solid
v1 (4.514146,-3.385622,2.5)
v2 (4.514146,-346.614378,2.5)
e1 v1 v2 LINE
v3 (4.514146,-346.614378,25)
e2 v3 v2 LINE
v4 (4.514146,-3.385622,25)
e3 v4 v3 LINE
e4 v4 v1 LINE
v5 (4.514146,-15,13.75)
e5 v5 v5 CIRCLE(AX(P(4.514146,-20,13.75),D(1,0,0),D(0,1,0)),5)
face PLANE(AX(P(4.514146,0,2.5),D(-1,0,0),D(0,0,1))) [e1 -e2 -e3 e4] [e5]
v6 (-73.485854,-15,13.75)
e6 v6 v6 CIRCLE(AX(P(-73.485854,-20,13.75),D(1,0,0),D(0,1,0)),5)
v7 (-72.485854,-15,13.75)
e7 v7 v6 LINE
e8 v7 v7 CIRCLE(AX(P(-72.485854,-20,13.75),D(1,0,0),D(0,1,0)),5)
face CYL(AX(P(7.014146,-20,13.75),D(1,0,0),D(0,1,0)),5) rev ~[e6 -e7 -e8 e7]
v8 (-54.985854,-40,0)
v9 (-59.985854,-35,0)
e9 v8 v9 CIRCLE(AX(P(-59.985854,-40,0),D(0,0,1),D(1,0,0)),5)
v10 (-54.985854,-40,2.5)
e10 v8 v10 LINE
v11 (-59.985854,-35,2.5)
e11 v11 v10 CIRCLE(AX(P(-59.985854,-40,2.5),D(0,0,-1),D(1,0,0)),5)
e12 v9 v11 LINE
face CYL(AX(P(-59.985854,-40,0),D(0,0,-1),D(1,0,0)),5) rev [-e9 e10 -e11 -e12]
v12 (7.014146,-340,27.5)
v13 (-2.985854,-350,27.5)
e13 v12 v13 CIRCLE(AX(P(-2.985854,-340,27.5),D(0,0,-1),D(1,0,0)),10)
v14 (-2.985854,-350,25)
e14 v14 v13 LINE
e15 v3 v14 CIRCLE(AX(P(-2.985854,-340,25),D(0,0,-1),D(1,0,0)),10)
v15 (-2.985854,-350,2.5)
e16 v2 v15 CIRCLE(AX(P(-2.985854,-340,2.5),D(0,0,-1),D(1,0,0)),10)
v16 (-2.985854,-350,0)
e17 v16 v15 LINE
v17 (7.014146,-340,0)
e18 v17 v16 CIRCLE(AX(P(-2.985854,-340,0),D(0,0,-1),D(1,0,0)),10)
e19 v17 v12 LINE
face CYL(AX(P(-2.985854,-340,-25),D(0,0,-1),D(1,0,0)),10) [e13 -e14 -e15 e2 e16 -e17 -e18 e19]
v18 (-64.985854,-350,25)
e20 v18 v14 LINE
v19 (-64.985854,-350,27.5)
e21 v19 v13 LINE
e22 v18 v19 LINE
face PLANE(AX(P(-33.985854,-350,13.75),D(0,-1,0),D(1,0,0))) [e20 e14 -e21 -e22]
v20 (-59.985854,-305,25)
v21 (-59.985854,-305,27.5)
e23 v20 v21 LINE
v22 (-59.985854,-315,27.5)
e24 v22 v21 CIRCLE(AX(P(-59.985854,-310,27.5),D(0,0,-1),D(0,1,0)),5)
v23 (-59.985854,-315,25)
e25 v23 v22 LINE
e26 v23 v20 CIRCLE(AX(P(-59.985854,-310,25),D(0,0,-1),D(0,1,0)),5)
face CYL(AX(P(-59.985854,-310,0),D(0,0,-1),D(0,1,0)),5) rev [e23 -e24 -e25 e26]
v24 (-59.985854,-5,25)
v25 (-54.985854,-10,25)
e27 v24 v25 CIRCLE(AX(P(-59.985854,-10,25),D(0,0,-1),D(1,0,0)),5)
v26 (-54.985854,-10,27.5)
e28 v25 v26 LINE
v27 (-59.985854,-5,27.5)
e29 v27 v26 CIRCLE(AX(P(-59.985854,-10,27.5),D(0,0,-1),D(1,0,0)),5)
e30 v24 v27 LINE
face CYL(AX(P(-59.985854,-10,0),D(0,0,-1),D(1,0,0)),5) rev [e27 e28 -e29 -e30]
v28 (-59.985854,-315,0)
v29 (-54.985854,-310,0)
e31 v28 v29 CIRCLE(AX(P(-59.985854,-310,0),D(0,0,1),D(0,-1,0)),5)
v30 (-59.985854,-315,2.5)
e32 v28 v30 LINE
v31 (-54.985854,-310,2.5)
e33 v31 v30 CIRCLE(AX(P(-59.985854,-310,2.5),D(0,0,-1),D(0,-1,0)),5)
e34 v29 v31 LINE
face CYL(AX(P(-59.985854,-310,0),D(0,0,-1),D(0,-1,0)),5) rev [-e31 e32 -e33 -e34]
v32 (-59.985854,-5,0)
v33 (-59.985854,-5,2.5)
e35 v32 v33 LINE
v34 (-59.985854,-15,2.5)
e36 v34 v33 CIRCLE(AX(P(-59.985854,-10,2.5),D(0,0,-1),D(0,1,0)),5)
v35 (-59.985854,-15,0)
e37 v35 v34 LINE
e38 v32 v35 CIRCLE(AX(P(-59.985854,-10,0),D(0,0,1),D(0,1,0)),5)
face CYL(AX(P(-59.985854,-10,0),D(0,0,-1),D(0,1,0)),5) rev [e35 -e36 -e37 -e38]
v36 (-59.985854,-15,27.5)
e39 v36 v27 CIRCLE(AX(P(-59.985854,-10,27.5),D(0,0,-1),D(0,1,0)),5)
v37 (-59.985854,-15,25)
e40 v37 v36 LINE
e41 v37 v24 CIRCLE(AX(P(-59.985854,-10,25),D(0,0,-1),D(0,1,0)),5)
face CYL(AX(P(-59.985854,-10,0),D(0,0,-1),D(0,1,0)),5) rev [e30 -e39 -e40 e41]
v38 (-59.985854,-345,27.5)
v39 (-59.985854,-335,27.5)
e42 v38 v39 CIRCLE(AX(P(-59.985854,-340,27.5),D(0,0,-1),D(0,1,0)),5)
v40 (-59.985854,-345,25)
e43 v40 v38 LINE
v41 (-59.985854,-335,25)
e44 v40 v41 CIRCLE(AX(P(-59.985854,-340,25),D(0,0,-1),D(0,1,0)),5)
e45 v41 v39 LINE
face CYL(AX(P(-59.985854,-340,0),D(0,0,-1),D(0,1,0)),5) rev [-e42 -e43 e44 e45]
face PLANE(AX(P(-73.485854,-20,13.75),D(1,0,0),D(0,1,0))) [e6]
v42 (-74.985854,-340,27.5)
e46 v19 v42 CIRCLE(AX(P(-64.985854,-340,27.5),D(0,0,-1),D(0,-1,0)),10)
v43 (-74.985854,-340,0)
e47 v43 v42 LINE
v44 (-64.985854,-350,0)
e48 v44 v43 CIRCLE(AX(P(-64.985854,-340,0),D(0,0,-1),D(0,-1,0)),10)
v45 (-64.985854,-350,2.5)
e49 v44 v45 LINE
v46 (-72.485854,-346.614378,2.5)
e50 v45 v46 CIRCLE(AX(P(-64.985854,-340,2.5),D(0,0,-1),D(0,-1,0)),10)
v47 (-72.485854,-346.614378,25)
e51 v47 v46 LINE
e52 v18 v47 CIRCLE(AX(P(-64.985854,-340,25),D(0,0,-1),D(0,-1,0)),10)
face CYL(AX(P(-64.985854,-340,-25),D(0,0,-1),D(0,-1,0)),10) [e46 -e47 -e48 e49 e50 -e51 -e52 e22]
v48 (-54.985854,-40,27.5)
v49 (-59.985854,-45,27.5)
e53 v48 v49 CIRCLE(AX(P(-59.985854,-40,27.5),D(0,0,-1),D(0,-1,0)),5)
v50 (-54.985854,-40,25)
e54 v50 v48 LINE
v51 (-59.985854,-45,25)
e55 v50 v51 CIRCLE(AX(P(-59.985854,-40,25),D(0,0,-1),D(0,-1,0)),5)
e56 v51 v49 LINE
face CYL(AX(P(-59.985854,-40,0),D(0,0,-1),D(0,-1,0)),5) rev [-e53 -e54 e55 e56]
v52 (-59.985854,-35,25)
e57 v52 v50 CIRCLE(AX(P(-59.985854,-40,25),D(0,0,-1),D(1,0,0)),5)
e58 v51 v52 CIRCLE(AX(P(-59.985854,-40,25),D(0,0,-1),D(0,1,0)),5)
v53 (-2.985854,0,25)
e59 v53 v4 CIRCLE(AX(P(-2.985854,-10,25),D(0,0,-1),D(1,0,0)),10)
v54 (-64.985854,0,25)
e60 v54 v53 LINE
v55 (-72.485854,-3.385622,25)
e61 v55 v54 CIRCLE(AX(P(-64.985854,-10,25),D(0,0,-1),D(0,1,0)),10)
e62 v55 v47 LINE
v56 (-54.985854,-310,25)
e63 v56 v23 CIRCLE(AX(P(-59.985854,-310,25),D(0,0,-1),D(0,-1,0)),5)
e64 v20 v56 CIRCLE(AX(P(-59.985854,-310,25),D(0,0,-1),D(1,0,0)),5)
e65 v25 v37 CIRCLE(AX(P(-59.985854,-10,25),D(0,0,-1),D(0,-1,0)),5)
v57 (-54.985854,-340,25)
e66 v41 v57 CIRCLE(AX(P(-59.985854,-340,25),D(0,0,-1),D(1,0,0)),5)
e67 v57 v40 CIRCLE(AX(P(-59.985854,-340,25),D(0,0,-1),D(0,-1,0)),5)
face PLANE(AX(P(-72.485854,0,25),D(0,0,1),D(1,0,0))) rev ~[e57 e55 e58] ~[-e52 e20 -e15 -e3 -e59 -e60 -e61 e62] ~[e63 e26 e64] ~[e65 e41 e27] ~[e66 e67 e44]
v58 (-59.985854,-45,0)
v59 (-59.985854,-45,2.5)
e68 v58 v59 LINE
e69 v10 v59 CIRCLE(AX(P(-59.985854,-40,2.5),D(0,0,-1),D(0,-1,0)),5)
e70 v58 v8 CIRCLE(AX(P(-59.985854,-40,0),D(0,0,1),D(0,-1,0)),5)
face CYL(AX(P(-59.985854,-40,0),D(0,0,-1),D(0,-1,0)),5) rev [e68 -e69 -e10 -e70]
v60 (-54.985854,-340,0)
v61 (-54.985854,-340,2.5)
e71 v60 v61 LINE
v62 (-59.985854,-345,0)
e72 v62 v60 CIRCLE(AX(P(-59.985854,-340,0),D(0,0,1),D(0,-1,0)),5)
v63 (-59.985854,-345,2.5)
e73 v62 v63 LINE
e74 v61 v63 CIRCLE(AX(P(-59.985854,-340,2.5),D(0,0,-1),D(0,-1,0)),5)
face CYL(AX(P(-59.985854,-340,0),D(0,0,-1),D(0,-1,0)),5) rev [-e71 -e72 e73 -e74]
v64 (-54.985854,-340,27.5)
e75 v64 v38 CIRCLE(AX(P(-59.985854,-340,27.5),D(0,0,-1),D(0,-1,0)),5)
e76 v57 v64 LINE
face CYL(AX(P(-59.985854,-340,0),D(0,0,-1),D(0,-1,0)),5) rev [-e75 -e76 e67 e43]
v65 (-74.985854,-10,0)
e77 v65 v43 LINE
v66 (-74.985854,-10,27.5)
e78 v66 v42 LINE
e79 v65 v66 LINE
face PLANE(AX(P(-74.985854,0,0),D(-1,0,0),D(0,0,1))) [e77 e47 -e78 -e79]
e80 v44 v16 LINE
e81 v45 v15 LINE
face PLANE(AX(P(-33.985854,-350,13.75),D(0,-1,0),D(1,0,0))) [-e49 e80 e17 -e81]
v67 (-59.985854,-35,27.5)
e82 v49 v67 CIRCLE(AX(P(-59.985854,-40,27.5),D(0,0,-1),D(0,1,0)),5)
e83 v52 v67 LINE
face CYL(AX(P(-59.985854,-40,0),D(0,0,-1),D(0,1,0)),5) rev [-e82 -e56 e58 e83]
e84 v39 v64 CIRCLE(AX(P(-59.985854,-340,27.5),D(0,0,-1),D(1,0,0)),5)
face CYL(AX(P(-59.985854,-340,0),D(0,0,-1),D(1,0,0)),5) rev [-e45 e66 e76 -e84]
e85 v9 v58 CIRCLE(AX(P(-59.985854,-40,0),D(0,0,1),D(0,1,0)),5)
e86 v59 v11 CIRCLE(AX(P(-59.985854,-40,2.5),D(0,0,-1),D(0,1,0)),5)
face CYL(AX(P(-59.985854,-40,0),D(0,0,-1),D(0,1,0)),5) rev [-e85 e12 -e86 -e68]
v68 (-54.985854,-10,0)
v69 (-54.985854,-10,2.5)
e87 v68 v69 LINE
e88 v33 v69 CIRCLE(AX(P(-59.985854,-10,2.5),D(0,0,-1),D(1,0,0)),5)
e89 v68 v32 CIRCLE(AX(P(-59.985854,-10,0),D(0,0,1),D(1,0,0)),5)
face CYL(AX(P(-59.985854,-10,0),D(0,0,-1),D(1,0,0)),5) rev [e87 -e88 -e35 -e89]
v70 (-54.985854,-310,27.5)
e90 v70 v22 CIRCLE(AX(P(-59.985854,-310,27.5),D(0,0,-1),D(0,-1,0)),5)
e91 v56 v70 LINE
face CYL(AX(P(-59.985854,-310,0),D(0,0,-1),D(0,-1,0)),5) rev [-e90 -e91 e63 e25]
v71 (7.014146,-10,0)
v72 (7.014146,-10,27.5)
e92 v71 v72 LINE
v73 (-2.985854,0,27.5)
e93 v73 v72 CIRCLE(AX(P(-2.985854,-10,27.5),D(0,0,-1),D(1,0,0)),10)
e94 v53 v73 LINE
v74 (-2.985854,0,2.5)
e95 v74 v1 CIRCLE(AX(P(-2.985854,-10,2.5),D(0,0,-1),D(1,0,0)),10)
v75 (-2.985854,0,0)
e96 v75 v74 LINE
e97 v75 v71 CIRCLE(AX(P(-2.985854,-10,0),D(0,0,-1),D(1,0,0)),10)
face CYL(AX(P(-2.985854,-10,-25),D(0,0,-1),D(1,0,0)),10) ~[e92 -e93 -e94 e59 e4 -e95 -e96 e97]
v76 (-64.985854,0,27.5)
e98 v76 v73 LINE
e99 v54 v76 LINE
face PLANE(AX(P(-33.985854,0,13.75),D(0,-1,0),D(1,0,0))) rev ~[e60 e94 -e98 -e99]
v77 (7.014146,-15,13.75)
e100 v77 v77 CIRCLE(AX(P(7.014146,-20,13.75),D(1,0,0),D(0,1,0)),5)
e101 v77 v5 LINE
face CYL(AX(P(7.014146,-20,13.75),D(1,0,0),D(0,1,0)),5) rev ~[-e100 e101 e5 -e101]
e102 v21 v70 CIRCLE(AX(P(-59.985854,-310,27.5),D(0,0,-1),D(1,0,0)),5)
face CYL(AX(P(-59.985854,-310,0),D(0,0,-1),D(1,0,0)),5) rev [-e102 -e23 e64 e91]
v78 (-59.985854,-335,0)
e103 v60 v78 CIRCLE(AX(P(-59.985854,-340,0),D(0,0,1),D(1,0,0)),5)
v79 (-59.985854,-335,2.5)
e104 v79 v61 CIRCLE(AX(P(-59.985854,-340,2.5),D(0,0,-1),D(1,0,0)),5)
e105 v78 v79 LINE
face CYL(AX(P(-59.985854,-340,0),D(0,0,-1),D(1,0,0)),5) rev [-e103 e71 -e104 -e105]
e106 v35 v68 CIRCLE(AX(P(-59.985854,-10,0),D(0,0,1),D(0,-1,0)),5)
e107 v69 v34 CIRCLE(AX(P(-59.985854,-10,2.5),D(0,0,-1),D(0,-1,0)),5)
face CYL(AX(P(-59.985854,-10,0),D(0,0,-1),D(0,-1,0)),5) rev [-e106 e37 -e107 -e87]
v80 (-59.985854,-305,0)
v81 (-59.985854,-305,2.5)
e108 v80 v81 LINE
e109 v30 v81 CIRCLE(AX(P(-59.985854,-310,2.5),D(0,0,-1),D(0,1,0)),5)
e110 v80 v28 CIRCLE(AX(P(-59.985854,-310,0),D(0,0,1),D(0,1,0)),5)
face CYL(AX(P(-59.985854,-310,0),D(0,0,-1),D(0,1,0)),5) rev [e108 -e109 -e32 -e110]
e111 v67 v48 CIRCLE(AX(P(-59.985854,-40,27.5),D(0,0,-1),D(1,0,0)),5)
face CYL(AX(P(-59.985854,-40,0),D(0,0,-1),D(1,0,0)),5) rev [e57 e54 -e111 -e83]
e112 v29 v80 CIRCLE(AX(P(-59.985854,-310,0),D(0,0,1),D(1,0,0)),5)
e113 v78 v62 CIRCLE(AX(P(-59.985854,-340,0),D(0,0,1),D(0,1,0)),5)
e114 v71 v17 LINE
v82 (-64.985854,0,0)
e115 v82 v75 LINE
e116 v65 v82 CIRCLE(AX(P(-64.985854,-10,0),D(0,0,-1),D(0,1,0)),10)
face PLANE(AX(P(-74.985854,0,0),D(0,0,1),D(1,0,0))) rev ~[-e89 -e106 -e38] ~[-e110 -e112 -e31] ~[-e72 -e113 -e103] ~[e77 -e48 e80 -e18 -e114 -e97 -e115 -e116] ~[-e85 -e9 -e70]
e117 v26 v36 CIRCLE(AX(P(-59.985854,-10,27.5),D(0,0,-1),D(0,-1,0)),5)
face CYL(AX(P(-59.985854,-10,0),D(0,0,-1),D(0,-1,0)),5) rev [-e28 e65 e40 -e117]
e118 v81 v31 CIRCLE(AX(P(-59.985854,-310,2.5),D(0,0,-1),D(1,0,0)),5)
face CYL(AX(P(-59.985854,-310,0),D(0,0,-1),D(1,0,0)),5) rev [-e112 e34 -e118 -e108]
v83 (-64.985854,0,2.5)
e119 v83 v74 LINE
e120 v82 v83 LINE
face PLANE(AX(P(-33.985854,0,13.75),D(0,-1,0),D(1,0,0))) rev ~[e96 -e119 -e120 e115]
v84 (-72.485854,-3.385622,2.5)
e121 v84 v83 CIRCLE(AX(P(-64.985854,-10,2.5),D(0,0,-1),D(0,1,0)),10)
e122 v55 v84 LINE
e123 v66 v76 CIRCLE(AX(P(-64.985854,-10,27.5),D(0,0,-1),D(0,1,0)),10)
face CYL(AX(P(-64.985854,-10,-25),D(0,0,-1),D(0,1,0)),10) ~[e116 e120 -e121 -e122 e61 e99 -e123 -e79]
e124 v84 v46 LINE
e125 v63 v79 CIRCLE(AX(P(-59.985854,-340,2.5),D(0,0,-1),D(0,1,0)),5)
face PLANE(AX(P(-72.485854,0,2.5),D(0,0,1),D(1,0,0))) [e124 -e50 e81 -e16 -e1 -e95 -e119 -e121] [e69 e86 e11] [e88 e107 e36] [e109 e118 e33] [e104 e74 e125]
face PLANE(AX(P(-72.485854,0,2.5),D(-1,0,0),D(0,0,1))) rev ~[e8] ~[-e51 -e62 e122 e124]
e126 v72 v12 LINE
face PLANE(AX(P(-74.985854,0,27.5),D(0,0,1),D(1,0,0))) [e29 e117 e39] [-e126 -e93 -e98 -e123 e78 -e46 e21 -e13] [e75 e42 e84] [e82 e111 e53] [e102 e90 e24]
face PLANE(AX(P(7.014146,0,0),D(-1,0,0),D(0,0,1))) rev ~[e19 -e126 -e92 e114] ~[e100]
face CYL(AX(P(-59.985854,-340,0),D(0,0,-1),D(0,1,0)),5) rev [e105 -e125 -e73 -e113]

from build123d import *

# Parameters (mm, degrees)
F0_W        = 82
F0_H        = 27.5
F0_W_2      = 77
F0_H_2      = 22.5
F1_DEPTH    = 350
F3_DEPTH    = 53
F4_T1_DEPTH = 77.5
F5_R        = 5
F6_DEPTH    = 80.5


# Not quite as in the source:
# - a fillet or chamfer that OpenCascade refuses, or shapes differently, is made with other operations: its cross-section is extruded or revolved along the edge and cut away or added
# - a feature names something its author has since deleted; it is built from what else it names


with BuildPart() as f1:
    # F0 (on Front) → F1 (new body)
    with BuildSketch(Plane.XZ):
        with Locations((-33.9858543277, 13.75)):
            Rectangle(F0_W, F0_H)
        with Locations((-33.9858543277, 13.75)):
            Rectangle(F0_W_2, F0_H_2, mode=Mode.SUBTRACT)
    extrude(amount=F1_DEPTH)

    # F2 (on Top) → F3 (cut)
    with BuildSketch(Plane.XY):
        with BuildLine():
            Line((-59.9858543277, -340), (-59.9858543277, -335))
            ThreePointArc((-59.9858543277, -335), (-64.9858543277, -340), (-59.9858543277, -345))
            Line((-59.9858543277, -345), (-59.9858543277, -340))
        make_face()
        with BuildLine():
            ThreePointArc((-54.9858543277, -340), (-56.4503204217, -336.4644660941), (-59.9858543277, -335))
            Line((-59.9858543277, -335), (-59.9858543277, -340))
            Line((-59.9858543277, -340), (-59.9858543277, -345))
            ThreePointArc((-59.9858543277, -345), (-56.4503204217, -343.5355339059), (-54.9858543277, -340))
        make_face()
        with BuildLine():
            Line((-59.9858543277, -45), (-59.9858543277, -35))
            ThreePointArc((-59.9858543277, -35), (-64.9858543277, -40), (-59.9858543277, -45))
        make_face()
        with BuildLine():
            ThreePointArc((-54.9858543277, -40), (-56.4503204217, -36.4644660941), (-59.9858543277, -35))
            Line((-59.9858543277, -35), (-59.9858543277, -45))
            ThreePointArc((-59.9858543277, -45), (-56.4503204217, -43.5355339059), (-54.9858543277, -40))
        make_face()
        with BuildLine():
            Line((-59.9858543277, -15), (-59.9858543277, -5))
            ThreePointArc((-59.9858543277, -5), (-64.9858543277, -10), (-59.9858543277, -15))
        make_face()
        with BuildLine():
            ThreePointArc((-59.9858543277, -15), (-56.4503204217, -13.5355339059), (-54.9858543277, -10))
            ThreePointArc((-54.9858543277, -10), (-56.4503204217, -6.4644660941), (-59.9858543277, -5))
            Line((-59.9858543277, -5), (-59.9858543277, -15))
        make_face()
        with BuildLine():
            Line((-59.9858543277, -315), (-59.9858543277, -305))
            ThreePointArc((-59.9858543277, -305), (-64.9858543277, -310), (-59.9858543277, -315))
        make_face()
        with BuildLine():
            ThreePointArc((-54.9858543277, -310), (-56.4503204217, -306.4644660941), (-59.9858543277, -305))
            Line((-59.9858543277, -305), (-59.9858543277, -315))
            ThreePointArc((-59.9858543277, -315), (-56.4503204217, -313.5355339059), (-54.9858543277, -310))
        make_face()
    extrude(amount=F3_DEPTH, mode=Mode.SUBTRACT)

    # F4: fillet of radius 10 on 4 edges, made by hand

    # F4_s2 → F4_t1 (cut)
    with BuildSketch(Plane.XY.offset(-25)):
        with BuildLine():
            ThreePointArc((-64.9858543277, 0), (-72.0569221395, -2.9289321881), (-74.9858543277, -10))
            Line((-74.9858543277, -10), (-74.9858543277, 0))
            Line((-74.9858543277, 0), (-64.9858543277, 0))
        make_face()
        with BuildLine():
            ThreePointArc((-64.9858543277, -350), (-72.0569221395, -347.0710678119), (-74.9858543277, -340))
            Line((-74.9858543277, -340), (-74.9858543277, -350))
            Line((-74.9858543277, -350), (-64.9858543277, -350))
        make_face()
        with BuildLine():
            ThreePointArc((7.0141456723, -10), (4.0852134842, -2.9289321881), (-2.9858543277, 0))
            Line((-2.9858543277, 0), (7.0141456723, 0))
            Line((7.0141456723, 0), (7.0141456723, -10))
        make_face()
        with BuildLine():
            ThreePointArc((7.0141456723, -340), (4.0852134842, -347.0710678119), (-2.9858543277, -350))
            Line((-2.9858543277, -350), (7.0141456723, -350))
            Line((7.0141456723, -350), (7.0141456723, -340))
        make_face()
    extrude(amount=F4_T1_DEPTH, mode=Mode.SUBTRACT)

    # F5 (on face) → F6 (cut)
    with BuildSketch(Plane.YZ.offset(7.0141456723)):
        with Locations((-20, 13.75)):
            Circle(F5_R)
    extrude(amount=-F6_DEPTH, mode=Mode.SUBTRACT)


solid = f1.part
